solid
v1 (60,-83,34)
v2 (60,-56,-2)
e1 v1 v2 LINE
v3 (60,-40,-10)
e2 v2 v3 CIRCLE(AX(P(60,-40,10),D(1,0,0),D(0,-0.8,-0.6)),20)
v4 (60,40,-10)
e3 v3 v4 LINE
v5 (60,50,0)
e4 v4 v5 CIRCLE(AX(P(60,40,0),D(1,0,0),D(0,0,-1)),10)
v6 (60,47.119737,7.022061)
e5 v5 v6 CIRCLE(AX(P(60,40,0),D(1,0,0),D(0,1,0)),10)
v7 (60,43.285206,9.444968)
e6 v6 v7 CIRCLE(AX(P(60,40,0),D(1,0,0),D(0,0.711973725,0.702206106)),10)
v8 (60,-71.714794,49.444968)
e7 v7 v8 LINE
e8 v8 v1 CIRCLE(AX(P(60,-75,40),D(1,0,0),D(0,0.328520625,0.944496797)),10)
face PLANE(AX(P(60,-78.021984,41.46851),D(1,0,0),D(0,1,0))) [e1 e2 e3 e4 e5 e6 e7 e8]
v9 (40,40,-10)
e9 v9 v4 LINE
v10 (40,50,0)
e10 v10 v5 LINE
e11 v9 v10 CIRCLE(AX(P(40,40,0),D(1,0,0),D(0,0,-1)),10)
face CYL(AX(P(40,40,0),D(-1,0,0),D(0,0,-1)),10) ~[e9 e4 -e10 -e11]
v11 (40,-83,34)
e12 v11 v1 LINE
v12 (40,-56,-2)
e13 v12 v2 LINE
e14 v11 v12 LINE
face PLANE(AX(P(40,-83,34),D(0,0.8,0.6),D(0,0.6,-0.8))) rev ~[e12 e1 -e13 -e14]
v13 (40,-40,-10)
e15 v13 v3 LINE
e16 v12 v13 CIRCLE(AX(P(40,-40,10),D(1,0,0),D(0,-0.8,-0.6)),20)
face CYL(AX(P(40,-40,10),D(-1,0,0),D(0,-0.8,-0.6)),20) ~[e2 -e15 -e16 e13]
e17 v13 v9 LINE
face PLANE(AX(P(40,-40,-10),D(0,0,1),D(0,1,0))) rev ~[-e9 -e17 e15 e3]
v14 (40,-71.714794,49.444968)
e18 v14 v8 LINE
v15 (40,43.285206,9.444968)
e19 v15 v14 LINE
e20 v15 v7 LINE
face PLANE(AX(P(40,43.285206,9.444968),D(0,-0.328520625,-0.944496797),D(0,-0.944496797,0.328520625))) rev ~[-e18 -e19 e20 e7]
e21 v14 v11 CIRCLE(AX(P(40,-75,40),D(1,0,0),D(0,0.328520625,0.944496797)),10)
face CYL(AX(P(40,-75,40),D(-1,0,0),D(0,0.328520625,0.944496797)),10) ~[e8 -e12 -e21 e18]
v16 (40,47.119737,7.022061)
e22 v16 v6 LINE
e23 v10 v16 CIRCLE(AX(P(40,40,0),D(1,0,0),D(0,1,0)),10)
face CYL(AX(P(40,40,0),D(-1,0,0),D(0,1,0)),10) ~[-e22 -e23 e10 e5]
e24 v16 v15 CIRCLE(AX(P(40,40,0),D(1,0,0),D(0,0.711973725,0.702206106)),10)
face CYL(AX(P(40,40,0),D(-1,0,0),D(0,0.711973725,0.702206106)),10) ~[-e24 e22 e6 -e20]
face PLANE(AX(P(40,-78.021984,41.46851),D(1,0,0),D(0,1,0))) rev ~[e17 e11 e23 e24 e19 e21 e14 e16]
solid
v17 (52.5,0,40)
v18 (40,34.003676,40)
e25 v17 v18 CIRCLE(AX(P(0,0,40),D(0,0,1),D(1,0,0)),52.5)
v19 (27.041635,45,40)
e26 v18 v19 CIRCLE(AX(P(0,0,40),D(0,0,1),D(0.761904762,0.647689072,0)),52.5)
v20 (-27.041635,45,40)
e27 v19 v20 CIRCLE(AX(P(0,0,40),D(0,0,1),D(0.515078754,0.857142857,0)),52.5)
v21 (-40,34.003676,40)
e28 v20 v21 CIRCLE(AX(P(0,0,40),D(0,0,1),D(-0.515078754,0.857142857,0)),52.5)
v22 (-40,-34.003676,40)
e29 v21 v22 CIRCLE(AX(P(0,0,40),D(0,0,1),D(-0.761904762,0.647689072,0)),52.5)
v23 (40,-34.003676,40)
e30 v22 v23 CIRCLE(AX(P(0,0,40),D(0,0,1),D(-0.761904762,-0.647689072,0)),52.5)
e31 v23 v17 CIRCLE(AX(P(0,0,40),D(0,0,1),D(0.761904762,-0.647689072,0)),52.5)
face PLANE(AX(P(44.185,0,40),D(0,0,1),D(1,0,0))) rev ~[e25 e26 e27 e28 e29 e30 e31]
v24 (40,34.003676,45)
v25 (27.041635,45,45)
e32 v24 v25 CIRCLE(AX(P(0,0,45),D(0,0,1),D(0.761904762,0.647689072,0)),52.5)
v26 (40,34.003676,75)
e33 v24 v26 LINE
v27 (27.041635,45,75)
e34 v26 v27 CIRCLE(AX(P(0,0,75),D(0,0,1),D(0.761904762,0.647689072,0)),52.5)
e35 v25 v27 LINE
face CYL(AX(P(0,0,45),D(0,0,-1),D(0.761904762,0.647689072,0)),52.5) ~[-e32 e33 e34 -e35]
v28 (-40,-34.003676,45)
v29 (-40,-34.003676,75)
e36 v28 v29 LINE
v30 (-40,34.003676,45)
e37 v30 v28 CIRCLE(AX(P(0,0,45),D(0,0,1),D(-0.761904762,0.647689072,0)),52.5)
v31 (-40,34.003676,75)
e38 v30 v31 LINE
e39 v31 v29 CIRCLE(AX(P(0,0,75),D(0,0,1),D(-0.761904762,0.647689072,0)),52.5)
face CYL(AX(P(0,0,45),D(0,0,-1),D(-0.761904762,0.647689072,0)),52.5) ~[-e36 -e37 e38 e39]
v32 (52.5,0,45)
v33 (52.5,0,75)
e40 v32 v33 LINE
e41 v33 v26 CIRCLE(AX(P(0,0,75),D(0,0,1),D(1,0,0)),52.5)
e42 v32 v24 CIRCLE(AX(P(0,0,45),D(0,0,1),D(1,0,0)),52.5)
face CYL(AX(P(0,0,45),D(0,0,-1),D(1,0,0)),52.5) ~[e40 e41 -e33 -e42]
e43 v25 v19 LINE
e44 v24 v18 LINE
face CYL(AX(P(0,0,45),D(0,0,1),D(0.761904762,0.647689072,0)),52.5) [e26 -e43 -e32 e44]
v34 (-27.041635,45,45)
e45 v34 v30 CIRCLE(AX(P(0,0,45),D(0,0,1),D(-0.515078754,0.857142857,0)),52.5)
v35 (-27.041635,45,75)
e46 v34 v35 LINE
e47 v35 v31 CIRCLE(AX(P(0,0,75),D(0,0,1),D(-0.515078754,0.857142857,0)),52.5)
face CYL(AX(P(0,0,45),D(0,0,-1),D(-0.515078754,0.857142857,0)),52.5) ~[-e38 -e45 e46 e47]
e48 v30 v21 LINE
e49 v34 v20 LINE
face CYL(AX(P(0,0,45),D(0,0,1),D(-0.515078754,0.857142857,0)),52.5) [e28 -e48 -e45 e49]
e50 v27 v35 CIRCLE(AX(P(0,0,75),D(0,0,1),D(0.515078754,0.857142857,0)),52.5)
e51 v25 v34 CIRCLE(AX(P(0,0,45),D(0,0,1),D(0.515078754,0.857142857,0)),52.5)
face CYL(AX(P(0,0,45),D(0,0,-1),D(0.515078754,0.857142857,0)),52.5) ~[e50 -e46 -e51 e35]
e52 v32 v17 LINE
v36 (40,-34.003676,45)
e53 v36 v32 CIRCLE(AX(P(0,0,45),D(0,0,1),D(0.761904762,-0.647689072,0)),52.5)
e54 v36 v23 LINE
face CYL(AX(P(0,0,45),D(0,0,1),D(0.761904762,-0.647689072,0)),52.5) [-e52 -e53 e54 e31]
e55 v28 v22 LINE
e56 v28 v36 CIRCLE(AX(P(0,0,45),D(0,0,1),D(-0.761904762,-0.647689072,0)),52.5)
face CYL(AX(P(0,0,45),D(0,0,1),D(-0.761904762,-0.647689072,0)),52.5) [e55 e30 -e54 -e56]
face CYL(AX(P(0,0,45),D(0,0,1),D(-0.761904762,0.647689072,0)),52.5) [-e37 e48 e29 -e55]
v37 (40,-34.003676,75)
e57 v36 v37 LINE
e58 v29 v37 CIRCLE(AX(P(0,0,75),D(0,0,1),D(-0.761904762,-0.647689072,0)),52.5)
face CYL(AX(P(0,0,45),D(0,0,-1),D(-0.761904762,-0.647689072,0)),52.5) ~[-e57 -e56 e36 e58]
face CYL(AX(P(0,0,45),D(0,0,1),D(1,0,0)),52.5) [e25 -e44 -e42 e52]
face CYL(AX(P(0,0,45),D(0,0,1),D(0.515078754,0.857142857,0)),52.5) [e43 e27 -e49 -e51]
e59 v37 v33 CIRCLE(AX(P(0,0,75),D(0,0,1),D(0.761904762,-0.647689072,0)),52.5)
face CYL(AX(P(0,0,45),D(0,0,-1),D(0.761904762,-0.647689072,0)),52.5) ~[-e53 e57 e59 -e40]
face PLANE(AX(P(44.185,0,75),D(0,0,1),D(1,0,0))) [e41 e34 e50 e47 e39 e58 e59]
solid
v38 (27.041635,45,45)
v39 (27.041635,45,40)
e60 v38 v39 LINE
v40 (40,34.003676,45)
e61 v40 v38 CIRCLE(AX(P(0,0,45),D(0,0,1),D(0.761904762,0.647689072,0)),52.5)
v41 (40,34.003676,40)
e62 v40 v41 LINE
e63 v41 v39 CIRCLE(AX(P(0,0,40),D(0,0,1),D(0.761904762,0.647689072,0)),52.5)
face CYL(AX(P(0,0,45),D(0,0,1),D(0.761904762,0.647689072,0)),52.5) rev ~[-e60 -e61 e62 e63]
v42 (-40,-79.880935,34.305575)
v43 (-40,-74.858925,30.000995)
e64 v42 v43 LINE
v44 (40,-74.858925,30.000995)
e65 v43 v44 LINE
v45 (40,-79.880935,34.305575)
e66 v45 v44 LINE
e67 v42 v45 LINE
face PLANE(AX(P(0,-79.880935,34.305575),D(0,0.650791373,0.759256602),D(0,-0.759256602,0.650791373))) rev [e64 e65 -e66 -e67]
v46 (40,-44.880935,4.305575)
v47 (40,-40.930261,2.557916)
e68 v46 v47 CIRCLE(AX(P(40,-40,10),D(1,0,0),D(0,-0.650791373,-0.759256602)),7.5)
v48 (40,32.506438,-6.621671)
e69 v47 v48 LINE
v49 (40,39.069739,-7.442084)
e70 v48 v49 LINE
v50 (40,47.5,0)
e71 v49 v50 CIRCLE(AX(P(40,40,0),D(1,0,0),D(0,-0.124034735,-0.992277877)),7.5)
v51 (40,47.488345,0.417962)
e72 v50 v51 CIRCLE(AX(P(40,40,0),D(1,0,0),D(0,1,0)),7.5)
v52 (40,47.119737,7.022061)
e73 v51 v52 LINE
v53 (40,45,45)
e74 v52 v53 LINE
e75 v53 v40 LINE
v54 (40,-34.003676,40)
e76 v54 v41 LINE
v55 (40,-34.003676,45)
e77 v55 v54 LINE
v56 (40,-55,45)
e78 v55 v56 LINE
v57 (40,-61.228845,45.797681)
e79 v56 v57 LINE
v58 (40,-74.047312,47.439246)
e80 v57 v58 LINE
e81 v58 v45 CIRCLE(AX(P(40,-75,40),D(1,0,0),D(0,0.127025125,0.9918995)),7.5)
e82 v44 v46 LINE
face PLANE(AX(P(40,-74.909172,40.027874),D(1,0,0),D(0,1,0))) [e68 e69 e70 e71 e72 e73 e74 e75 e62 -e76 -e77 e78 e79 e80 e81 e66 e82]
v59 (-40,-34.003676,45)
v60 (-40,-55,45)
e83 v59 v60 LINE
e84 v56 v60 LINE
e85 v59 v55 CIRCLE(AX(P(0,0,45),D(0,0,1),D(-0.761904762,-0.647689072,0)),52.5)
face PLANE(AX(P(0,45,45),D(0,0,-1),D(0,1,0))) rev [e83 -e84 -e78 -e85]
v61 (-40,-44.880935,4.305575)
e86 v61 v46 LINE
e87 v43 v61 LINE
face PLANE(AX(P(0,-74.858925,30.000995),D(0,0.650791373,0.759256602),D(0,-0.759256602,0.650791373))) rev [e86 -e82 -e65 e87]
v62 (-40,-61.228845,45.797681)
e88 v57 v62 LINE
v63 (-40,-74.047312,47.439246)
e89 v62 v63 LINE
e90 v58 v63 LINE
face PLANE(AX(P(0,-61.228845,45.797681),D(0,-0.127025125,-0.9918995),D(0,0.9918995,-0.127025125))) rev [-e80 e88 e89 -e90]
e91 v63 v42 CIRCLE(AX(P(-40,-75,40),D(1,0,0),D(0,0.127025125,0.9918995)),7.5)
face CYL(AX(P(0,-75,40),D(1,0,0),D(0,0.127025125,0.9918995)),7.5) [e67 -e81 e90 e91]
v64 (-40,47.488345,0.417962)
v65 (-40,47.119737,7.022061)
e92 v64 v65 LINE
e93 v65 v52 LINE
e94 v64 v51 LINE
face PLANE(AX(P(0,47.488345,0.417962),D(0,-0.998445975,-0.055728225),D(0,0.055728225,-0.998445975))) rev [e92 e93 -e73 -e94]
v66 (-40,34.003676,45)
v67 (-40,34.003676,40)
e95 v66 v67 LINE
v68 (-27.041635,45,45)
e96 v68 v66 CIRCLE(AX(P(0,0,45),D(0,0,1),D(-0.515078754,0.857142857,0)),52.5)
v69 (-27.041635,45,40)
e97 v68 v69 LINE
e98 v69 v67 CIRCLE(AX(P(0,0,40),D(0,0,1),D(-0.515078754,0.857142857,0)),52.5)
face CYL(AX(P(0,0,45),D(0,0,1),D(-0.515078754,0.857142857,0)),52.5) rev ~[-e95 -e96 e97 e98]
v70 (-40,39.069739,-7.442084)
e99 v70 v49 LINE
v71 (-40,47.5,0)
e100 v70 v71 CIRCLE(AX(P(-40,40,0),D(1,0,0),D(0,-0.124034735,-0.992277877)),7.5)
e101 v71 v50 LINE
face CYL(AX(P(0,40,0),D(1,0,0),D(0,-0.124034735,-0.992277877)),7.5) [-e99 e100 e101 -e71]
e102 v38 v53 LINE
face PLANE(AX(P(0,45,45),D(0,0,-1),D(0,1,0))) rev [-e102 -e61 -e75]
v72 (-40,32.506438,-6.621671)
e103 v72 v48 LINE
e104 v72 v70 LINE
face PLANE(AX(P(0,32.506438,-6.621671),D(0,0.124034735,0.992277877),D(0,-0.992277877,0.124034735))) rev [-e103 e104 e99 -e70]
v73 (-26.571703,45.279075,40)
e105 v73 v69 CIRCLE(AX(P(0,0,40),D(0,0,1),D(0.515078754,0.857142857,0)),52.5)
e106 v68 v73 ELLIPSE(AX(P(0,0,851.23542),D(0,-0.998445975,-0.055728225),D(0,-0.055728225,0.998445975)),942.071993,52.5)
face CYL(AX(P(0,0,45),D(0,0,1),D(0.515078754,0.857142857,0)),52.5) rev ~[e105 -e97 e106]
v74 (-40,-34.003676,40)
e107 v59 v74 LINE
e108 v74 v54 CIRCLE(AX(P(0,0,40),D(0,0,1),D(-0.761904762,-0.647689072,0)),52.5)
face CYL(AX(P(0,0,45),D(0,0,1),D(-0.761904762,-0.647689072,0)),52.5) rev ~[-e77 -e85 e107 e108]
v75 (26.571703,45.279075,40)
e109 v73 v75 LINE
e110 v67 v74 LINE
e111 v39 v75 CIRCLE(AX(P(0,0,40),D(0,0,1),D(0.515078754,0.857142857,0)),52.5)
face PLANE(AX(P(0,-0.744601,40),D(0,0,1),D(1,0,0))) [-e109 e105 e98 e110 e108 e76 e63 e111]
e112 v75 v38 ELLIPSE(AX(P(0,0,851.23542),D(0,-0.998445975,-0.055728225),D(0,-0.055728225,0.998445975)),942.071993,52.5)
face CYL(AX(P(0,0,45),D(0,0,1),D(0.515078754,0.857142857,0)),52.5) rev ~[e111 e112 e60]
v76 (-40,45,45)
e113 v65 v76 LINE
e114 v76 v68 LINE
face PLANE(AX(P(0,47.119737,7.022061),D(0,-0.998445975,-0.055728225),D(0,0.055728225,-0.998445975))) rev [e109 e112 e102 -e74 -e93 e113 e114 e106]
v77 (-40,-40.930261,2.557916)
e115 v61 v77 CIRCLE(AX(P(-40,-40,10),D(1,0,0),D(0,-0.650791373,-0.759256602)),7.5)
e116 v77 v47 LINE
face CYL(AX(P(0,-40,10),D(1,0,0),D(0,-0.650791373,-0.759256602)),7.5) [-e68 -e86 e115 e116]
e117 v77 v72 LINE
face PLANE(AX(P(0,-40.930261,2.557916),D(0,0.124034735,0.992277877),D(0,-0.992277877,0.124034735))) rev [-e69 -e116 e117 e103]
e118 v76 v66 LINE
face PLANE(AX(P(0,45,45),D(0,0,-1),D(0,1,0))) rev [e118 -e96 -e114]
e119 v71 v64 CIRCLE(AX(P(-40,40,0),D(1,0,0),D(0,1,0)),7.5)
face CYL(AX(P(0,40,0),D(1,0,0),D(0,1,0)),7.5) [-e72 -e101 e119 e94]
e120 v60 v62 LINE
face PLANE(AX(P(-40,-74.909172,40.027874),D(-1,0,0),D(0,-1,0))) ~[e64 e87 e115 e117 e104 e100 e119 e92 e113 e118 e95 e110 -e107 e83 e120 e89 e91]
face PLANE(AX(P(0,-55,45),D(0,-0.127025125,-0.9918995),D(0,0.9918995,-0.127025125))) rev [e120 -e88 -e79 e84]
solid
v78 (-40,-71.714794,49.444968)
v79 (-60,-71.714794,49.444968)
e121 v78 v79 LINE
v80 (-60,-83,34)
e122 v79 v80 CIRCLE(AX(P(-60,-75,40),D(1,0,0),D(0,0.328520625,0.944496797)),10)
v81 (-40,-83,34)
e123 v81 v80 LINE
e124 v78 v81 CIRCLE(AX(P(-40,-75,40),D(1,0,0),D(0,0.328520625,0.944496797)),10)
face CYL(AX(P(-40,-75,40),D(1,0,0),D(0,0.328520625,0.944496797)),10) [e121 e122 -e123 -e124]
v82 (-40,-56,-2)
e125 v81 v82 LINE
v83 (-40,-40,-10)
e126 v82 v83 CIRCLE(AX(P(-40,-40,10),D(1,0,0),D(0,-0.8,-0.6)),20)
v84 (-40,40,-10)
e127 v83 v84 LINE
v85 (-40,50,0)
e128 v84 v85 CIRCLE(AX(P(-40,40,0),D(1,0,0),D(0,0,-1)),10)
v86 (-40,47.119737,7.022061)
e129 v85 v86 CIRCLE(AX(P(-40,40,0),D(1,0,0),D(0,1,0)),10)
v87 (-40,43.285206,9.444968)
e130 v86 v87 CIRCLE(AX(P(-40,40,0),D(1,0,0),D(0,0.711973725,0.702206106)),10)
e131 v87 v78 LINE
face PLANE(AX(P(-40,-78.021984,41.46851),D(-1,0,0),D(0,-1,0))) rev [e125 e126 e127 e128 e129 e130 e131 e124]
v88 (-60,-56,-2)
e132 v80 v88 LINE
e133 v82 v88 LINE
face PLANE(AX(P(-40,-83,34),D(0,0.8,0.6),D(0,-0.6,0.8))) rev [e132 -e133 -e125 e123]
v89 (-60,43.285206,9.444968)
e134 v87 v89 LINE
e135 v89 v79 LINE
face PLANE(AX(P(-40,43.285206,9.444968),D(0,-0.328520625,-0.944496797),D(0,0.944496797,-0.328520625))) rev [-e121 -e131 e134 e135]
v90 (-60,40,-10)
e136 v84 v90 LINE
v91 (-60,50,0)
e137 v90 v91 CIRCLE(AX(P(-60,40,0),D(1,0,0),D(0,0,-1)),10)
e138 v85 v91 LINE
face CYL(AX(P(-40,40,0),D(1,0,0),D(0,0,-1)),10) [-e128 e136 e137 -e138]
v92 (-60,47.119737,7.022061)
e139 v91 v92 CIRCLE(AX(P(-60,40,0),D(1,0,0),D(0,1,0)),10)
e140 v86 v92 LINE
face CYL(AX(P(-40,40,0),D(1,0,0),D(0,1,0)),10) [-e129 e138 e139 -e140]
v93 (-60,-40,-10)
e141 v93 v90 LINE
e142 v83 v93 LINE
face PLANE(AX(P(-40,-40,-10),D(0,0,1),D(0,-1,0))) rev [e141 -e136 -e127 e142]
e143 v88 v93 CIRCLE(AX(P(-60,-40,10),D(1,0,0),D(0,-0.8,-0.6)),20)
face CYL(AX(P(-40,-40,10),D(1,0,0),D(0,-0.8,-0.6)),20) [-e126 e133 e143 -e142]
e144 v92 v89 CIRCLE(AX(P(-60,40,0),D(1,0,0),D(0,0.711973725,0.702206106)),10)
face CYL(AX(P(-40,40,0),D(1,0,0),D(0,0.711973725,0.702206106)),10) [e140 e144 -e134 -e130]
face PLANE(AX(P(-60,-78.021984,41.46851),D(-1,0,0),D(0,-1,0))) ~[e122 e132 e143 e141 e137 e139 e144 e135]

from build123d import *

# Parameters (mm, degrees)
F1_DEPTH      = 40
F2_START      = 40
F2_DEPTH      = 20
F6_DEPTH      = 5
F7_DEPTH      = 30
F7_DEPTH_BACK = 5


with BuildPart() as f1:
    # F0 (on Right) → F1 (new body)
    with BuildSketch(Plane.YZ):
        with BuildLine():
            ThreePointArc((-67.5, 40), (-69.3699394637, 44.9550396928), (-74.047311562, 47.4392462481))
            ThreePointArc((-74.047311562, 47.4392462481), (-81.8542766067, 43.0444855394), (-79.8809353009, 34.3055754823))
            ThreePointArc((-79.8809353009, 34.3055754823), (-71.8660739285, 33.1861532613), (-67.5, 40))
        make_face()
        with BuildLine():
            Line((-22.5329362893, 0.2582503971), (32.5064382574, -6.6216714212))
            ThreePointArc((32.5064382574, -6.6216714212), (31.6956764696, 5.5711947285), (43.2852062494, 9.4449679671))
            Line((43.2852062494, 9.4449679671), (-61.2288449484, 45.7976814272))
            Line((-61.2288449484, 45.7976814272), (-67.4865130573, 46.5990540202))
            ThreePointArc((-67.4865130573, 46.5990540202), (-65.6422526902, 43.5259843004), (-65, 40))
            ThreePointArc((-65, 40), (-67.8792292984, 32.9789869239), (-74.8589249231, 30.0009951584))
            Line((-74.8589249231, 30.0009951584), (-58.9579294654, 16.3715704804))
            ThreePointArc((-58.9579294654, 16.3715704804), (-36.7718882692, 29.7377631624), (-20, 10))
            ThreePointArc((-20, 10), (-20.6435892504, 4.9671714819), (-22.5329362893, 0.2582503971))
        make_face()
        with BuildLine():
            ThreePointArc((-65, 40), (-65.6422526902, 43.5259843004), (-67.4865130573, 46.5990540202))
            Line((-67.4865130573, 46.5990540202), (-74.047311562, 47.4392462481))
            ThreePointArc((-74.047311562, 47.4392462481), (-69.3699394637, 44.9550396928), (-67.5, 40))
            ThreePointArc((-67.5, 40), (-71.8660739285, 33.1861532613), (-79.8809353009, 34.3055754823))
            Line((-79.8809353009, 34.3055754823), (-74.8589249231, 30.0009951584))
            ThreePointArc((-74.8589249231, 30.0009951584), (-67.8792292984, 32.9789869239), (-65, 40))
        make_face()
        with BuildLine():
            Line((-40.9302605094, 2.5579159246), (-22.5329362893, 0.2582503971))
            ThreePointArc((-22.5329362893, 0.2582503971), (-20.6435892504, 4.9671714819), (-20, 10))
            ThreePointArc((-20, 10), (-36.7718882692, 29.7377631624), (-58.9579294654, 16.3715704804))
            Line((-58.9579294654, 16.3715704804), (-44.8809353009, 4.3055754823))
            ThreePointArc((-44.8809353009, 4.3055754823), (-43.1339260715, 16.8138467387), (-32.5, 10))
            ThreePointArc((-32.5, 10), (-35.0364807757, 4.3774136814), (-40.9302605094, 2.5579159246))
        make_face()
        with BuildLine():
            ThreePointArc((-44.8809353009, 4.3055754823), (-43.0341518863, 3.1411427824), (-40.9302605094, 2.5579159246))
            ThreePointArc((-40.9302605094, 2.5579159246), (-35.0364807757, 4.3774136814), (-32.5, 10))
            ThreePointArc((-32.5, 10), (-43.1339260715, 16.8138467387), (-44.8809353009, 4.3055754823))
        make_face()
        with BuildLine():
            ThreePointArc((47.4883448123, 0.4179616875), (34.8816802289, 5.4820436628), (39.0697394906, -7.4420840754))
            ThreePointArc((39.0697394906, -7.4420840754), (44.9635192243, -5.6225863186), (47.5, 0))
            ThreePointArc((47.5, 0), (47.4970856368, 0.2090620815), (47.4883448123, 0.4179616875))
        make_face()
        with BuildLine():
            ThreePointArc((43.2852062494, 9.4449679671), (31.6956764696, 5.5711947285), (32.5064382574, -6.6216714212))
            Line((32.5064382574, -6.6216714212), (39.0697394906, -7.4420840754))
            ThreePointArc((39.0697394906, -7.4420840754), (34.8816802289, 5.4820436628), (47.4883448123, 0.4179616875))
            Line((47.4883448123, 0.4179616875), (47.1197372514, 7.0220610558))
            ThreePointArc((47.1197372514, 7.0220610558), (45.3416600218, 8.4537960829), (43.2852062494, 9.4449679671))
        make_face()
        with BuildLine():
            ThreePointArc((43.2852062494, 9.4449679671), (45.3416600218, 8.4537960829), (47.1197372514, 7.0220610558))
            Line((47.1197372514, 7.0220610558), (45, 45))
            Line((45, 45), (-55, 45))
            Line((-55, 45), (-61.2288449484, 45.7976814272))
            Line((-61.2288449484, 45.7976814272), (43.2852062494, 9.4449679671))
        make_face()
    extrude(amount=F1_DEPTH)

    # F4: F1 across plane


with BuildPart() as f2:
    # F0 (on Right) → F2 (new body)
    with BuildSketch(Plane.YZ.offset(F2_START)):
        with BuildLine():
            ThreePointArc((-71.7147937506, 49.4449679671), (-83.0742850398, 45.8996543201), (-83, 34))
            ThreePointArc((-83, 34), (-79.4089324294, 31.0244044859), (-74.8589249231, 30.0009951584))
            Line((-74.8589249231, 30.0009951584), (-79.8809353009, 34.3055754823))
            ThreePointArc((-79.8809353009, 34.3055754823), (-81.8542766067, 43.0444855394), (-74.047311562, 47.4392462481))
            Line((-74.047311562, 47.4392462481), (-67.4865130573, 46.5990540202))
            ThreePointArc((-67.4865130573, 46.5990540202), (-69.4162960131, 48.2959176579), (-71.7147937506, 49.4449679671))
        make_face()
        with BuildLine():
            Line((-67.4865130573, 46.5990540202), (-61.2288449484, 45.7976814272))
            Line((-61.2288449484, 45.7976814272), (-71.7147937506, 49.4449679671))
            ThreePointArc((-71.7147937506, 49.4449679671), (-69.4162960131, 48.2959176579), (-67.4865130573, 46.5990540202))
        make_face()
        with BuildLine():
            Line((-83, 34), (-56, -2))
            ThreePointArc((-56, -2), (-59.7457048141, 6.8208269322), (-58.9579294654, 16.3715704804))
            Line((-58.9579294654, 16.3715704804), (-74.8589249231, 30.0009951584))
            ThreePointArc((-74.8589249231, 30.0009951584), (-79.4089324294, 31.0244044859), (-83, 34))
        make_face()
        with BuildLine():
            ThreePointArc((-67.5, 40), (-69.3699394637, 44.9550396928), (-74.047311562, 47.4392462481))
            ThreePointArc((-74.047311562, 47.4392462481), (-81.8542766067, 43.0444855394), (-79.8809353009, 34.3055754823))
            ThreePointArc((-79.8809353009, 34.3055754823), (-71.8660739285, 33.1861532613), (-67.5, 40))
        make_face()
        with BuildLine():
            ThreePointArc((-65, 40), (-65.6422526902, 43.5259843004), (-67.4865130573, 46.5990540202))
            Line((-67.4865130573, 46.5990540202), (-74.047311562, 47.4392462481))
            ThreePointArc((-74.047311562, 47.4392462481), (-69.3699394637, 44.9550396928), (-67.5, 40))
            ThreePointArc((-67.5, 40), (-71.8660739285, 33.1861532613), (-79.8809353009, 34.3055754823))
            Line((-79.8809353009, 34.3055754823), (-74.8589249231, 30.0009951584))
            ThreePointArc((-74.8589249231, 30.0009951584), (-67.8792292984, 32.9789869239), (-65, 40))
        make_face()
        with BuildLine():
            Line((-22.5329362893, 0.2582503971), (32.5064382574, -6.6216714212))
            ThreePointArc((32.5064382574, -6.6216714212), (31.6956764696, 5.5711947285), (43.2852062494, 9.4449679671))
            Line((43.2852062494, 9.4449679671), (-61.2288449484, 45.7976814272))
            Line((-61.2288449484, 45.7976814272), (-67.4865130573, 46.5990540202))
            ThreePointArc((-67.4865130573, 46.5990540202), (-65.6422526902, 43.5259843004), (-65, 40))
            ThreePointArc((-65, 40), (-67.8792292984, 32.9789869239), (-74.8589249231, 30.0009951584))
            Line((-74.8589249231, 30.0009951584), (-58.9579294654, 16.3715704804))
            ThreePointArc((-58.9579294654, 16.3715704804), (-36.7718882692, 29.7377631624), (-20, 10))
            ThreePointArc((-20, 10), (-20.6435892504, 4.9671714819), (-22.5329362893, 0.2582503971))
        make_face()
        with BuildLine():
            ThreePointArc((-44.8809353009, 4.3055754823), (-43.0341518863, 3.1411427824), (-40.9302605094, 2.5579159246))
            ThreePointArc((-40.9302605094, 2.5579159246), (-35.0364807757, 4.3774136814), (-32.5, 10))
            ThreePointArc((-32.5, 10), (-43.1339260715, 16.8138467387), (-44.8809353009, 4.3055754823))
        make_face()
        with BuildLine():
            ThreePointArc((-56, -2), (-48.94427191, -7.88854382), (-40, -10))
            ThreePointArc((-40, -10), (-29.8716978732, -7.2457964742), (-22.5329362893, 0.2582503971))
            Line((-22.5329362893, 0.2582503971), (-40.9302605094, 2.5579159246))
            ThreePointArc((-40.9302605094, 2.5579159246), (-43.0341518863, 3.1411427824), (-44.8809353009, 4.3055754823))
            Line((-44.8809353009, 4.3055754823), (-58.9579294654, 16.3715704804))
            ThreePointArc((-58.9579294654, 16.3715704804), (-59.7457048141, 6.8208269322), (-56, -2))
        make_face()
        with BuildLine():
            ThreePointArc((43.2852062494, 9.4449679671), (31.6956764696, 5.5711947285), (32.5064382574, -6.6216714212))
            Line((32.5064382574, -6.6216714212), (39.0697394906, -7.4420840754))
            ThreePointArc((39.0697394906, -7.4420840754), (34.8816802289, 5.4820436628), (47.4883448123, 0.4179616875))
            Line((47.4883448123, 0.4179616875), (47.1197372514, 7.0220610558))
            ThreePointArc((47.1197372514, 7.0220610558), (45.3416600218, 8.4537960829), (43.2852062494, 9.4449679671))
        make_face()
        with BuildLine():
            ThreePointArc((47.4883448123, 0.4179616875), (34.8816802289, 5.4820436628), (39.0697394906, -7.4420840754))
            ThreePointArc((39.0697394906, -7.4420840754), (44.9635192243, -5.6225863186), (47.5, 0))
            ThreePointArc((47.5, 0), (47.4970856368, 0.2090620815), (47.4883448123, 0.4179616875))
        make_face()
        with BuildLine():
            ThreePointArc((32.5064382574, -6.6216714212), (35.8900556094, -9.1163785083), (40, -10))
            ThreePointArc((40, -10), (47.0710678119, -7.0710678119), (50, 0))
            ThreePointArc((50, 0), (49.2519558071, 3.7949062891), (47.1197372514, 7.0220610558))
            Line((47.1197372514, 7.0220610558), (47.4883448123, 0.4179616875))
            ThreePointArc((47.4883448123, 0.4179616875), (47.4970856368, 0.2090620815), (47.5, 0))
            ThreePointArc((47.5, 0), (44.9635192243, -5.6225863186), (39.0697394906, -7.4420840754))
            Line((39.0697394906, -7.4420840754), (32.5064382574, -6.6216714212))
        make_face()
        with BuildLine():
            Line((-40, -10), (40, -10))
            ThreePointArc((40, -10), (35.8900556094, -9.1163785083), (32.5064382574, -6.6216714212))
            Line((32.5064382574, -6.6216714212), (-22.5329362893, 0.2582503971))
            ThreePointArc((-22.5329362893, 0.2582503971), (-29.8716978732, -7.2457964742), (-40, -10))
        make_face()
        with BuildLine():
            Line((-40.9302605094, 2.5579159246), (-22.5329362893, 0.2582503971))
            ThreePointArc((-22.5329362893, 0.2582503971), (-20.6435892504, 4.9671714819), (-20, 10))
            ThreePointArc((-20, 10), (-36.7718882692, 29.7377631624), (-58.9579294654, 16.3715704804))
            Line((-58.9579294654, 16.3715704804), (-44.8809353009, 4.3055754823))
            ThreePointArc((-44.8809353009, 4.3055754823), (-43.1339260715, 16.8138467387), (-32.5, 10))
            ThreePointArc((-32.5, 10), (-35.0364807757, 4.3774136814), (-40.9302605094, 2.5579159246))
        make_face()
    extrude(amount=F2_DEPTH)


with BuildPart() as f3_1:
    # F3: instance of F2
    add(f2.part.mirror(Plane.YZ))


with BuildPart() as f1_1:
    add(f1.part)
    add(f1.part.mirror(Plane.YZ))

    # F5 (on face) → F6 (cut)
    with BuildSketch(Plane.XY.offset(45)):
        with BuildLine():
            Line((40, -34.0036762718), (40, 34.0036762718))
            ThreePointArc((40, 34.0036762718), (33.9687352606, 40.0296768011), (27.041634566, 45))
            Line((27.041634566, 45), (-27.041634566, 45))
            ThreePointArc((-27.041634566, 45), (-33.9687352606, 40.0296768011), (-40, 34.0036762718))
            Line((-40, 34.0036762718), (-40, -34.0036762718))
            ThreePointArc((-40, -34.0036762718), (0, -52.5), (40, -34.0036762718))
        make_face()
        with BuildLine():
            Line((-27.041634566, 45), (27.041634566, 45))
            ThreePointArc((27.041634566, 45), (0, 52.5), (-27.041634566, 45))
        make_face()
    extrude(amount=-F6_DEPTH, mode=Mode.SUBTRACT)


with BuildPart() as f7:
    # F5 (on face) → F7 (new body, two sides)
    with BuildSketch(Plane.XY.offset(45)) as f7_sk:
        with BuildLine():
            ThreePointArc((40, -34.0036762718), (49.2760083611, -18.1142209327), (52.5, 0))
            ThreePointArc((52.5, 0), (49.2760083611, 18.1142209327), (40, 34.0036762718))
            Line((40, 34.0036762718), (40, -34.0036762718))
        make_face()
        with BuildLine():
            Line((40, -34.0036762718), (40, 34.0036762718))
            ThreePointArc((40, 34.0036762718), (33.9687352606, 40.0296768011), (27.041634566, 45))
            Line((27.041634566, 45), (-27.041634566, 45))
            ThreePointArc((-27.041634566, 45), (-33.9687352606, 40.0296768011), (-40, 34.0036762718))
            Line((-40, 34.0036762718), (-40, -34.0036762718))
            ThreePointArc((-40, -34.0036762718), (0, -52.5), (40, -34.0036762718))
        make_face()
        with BuildLine():
            Line((-27.041634566, 45), (27.041634566, 45))
            ThreePointArc((27.041634566, 45), (0, 52.5), (-27.041634566, 45))
        make_face()
        with BuildLine():
            ThreePointArc((-40, 34.0036762718), (-52.5, 0), (-40, -34.0036762718))
            Line((-40, -34.0036762718), (-40, 34.0036762718))
        make_face()
    extrude(amount=F7_DEPTH)
    extrude(f7_sk.sketch, amount=-F7_DEPTH_BACK)


solid = Compound([f2.part, f3_1.part, f1_1.part, f7.part])
